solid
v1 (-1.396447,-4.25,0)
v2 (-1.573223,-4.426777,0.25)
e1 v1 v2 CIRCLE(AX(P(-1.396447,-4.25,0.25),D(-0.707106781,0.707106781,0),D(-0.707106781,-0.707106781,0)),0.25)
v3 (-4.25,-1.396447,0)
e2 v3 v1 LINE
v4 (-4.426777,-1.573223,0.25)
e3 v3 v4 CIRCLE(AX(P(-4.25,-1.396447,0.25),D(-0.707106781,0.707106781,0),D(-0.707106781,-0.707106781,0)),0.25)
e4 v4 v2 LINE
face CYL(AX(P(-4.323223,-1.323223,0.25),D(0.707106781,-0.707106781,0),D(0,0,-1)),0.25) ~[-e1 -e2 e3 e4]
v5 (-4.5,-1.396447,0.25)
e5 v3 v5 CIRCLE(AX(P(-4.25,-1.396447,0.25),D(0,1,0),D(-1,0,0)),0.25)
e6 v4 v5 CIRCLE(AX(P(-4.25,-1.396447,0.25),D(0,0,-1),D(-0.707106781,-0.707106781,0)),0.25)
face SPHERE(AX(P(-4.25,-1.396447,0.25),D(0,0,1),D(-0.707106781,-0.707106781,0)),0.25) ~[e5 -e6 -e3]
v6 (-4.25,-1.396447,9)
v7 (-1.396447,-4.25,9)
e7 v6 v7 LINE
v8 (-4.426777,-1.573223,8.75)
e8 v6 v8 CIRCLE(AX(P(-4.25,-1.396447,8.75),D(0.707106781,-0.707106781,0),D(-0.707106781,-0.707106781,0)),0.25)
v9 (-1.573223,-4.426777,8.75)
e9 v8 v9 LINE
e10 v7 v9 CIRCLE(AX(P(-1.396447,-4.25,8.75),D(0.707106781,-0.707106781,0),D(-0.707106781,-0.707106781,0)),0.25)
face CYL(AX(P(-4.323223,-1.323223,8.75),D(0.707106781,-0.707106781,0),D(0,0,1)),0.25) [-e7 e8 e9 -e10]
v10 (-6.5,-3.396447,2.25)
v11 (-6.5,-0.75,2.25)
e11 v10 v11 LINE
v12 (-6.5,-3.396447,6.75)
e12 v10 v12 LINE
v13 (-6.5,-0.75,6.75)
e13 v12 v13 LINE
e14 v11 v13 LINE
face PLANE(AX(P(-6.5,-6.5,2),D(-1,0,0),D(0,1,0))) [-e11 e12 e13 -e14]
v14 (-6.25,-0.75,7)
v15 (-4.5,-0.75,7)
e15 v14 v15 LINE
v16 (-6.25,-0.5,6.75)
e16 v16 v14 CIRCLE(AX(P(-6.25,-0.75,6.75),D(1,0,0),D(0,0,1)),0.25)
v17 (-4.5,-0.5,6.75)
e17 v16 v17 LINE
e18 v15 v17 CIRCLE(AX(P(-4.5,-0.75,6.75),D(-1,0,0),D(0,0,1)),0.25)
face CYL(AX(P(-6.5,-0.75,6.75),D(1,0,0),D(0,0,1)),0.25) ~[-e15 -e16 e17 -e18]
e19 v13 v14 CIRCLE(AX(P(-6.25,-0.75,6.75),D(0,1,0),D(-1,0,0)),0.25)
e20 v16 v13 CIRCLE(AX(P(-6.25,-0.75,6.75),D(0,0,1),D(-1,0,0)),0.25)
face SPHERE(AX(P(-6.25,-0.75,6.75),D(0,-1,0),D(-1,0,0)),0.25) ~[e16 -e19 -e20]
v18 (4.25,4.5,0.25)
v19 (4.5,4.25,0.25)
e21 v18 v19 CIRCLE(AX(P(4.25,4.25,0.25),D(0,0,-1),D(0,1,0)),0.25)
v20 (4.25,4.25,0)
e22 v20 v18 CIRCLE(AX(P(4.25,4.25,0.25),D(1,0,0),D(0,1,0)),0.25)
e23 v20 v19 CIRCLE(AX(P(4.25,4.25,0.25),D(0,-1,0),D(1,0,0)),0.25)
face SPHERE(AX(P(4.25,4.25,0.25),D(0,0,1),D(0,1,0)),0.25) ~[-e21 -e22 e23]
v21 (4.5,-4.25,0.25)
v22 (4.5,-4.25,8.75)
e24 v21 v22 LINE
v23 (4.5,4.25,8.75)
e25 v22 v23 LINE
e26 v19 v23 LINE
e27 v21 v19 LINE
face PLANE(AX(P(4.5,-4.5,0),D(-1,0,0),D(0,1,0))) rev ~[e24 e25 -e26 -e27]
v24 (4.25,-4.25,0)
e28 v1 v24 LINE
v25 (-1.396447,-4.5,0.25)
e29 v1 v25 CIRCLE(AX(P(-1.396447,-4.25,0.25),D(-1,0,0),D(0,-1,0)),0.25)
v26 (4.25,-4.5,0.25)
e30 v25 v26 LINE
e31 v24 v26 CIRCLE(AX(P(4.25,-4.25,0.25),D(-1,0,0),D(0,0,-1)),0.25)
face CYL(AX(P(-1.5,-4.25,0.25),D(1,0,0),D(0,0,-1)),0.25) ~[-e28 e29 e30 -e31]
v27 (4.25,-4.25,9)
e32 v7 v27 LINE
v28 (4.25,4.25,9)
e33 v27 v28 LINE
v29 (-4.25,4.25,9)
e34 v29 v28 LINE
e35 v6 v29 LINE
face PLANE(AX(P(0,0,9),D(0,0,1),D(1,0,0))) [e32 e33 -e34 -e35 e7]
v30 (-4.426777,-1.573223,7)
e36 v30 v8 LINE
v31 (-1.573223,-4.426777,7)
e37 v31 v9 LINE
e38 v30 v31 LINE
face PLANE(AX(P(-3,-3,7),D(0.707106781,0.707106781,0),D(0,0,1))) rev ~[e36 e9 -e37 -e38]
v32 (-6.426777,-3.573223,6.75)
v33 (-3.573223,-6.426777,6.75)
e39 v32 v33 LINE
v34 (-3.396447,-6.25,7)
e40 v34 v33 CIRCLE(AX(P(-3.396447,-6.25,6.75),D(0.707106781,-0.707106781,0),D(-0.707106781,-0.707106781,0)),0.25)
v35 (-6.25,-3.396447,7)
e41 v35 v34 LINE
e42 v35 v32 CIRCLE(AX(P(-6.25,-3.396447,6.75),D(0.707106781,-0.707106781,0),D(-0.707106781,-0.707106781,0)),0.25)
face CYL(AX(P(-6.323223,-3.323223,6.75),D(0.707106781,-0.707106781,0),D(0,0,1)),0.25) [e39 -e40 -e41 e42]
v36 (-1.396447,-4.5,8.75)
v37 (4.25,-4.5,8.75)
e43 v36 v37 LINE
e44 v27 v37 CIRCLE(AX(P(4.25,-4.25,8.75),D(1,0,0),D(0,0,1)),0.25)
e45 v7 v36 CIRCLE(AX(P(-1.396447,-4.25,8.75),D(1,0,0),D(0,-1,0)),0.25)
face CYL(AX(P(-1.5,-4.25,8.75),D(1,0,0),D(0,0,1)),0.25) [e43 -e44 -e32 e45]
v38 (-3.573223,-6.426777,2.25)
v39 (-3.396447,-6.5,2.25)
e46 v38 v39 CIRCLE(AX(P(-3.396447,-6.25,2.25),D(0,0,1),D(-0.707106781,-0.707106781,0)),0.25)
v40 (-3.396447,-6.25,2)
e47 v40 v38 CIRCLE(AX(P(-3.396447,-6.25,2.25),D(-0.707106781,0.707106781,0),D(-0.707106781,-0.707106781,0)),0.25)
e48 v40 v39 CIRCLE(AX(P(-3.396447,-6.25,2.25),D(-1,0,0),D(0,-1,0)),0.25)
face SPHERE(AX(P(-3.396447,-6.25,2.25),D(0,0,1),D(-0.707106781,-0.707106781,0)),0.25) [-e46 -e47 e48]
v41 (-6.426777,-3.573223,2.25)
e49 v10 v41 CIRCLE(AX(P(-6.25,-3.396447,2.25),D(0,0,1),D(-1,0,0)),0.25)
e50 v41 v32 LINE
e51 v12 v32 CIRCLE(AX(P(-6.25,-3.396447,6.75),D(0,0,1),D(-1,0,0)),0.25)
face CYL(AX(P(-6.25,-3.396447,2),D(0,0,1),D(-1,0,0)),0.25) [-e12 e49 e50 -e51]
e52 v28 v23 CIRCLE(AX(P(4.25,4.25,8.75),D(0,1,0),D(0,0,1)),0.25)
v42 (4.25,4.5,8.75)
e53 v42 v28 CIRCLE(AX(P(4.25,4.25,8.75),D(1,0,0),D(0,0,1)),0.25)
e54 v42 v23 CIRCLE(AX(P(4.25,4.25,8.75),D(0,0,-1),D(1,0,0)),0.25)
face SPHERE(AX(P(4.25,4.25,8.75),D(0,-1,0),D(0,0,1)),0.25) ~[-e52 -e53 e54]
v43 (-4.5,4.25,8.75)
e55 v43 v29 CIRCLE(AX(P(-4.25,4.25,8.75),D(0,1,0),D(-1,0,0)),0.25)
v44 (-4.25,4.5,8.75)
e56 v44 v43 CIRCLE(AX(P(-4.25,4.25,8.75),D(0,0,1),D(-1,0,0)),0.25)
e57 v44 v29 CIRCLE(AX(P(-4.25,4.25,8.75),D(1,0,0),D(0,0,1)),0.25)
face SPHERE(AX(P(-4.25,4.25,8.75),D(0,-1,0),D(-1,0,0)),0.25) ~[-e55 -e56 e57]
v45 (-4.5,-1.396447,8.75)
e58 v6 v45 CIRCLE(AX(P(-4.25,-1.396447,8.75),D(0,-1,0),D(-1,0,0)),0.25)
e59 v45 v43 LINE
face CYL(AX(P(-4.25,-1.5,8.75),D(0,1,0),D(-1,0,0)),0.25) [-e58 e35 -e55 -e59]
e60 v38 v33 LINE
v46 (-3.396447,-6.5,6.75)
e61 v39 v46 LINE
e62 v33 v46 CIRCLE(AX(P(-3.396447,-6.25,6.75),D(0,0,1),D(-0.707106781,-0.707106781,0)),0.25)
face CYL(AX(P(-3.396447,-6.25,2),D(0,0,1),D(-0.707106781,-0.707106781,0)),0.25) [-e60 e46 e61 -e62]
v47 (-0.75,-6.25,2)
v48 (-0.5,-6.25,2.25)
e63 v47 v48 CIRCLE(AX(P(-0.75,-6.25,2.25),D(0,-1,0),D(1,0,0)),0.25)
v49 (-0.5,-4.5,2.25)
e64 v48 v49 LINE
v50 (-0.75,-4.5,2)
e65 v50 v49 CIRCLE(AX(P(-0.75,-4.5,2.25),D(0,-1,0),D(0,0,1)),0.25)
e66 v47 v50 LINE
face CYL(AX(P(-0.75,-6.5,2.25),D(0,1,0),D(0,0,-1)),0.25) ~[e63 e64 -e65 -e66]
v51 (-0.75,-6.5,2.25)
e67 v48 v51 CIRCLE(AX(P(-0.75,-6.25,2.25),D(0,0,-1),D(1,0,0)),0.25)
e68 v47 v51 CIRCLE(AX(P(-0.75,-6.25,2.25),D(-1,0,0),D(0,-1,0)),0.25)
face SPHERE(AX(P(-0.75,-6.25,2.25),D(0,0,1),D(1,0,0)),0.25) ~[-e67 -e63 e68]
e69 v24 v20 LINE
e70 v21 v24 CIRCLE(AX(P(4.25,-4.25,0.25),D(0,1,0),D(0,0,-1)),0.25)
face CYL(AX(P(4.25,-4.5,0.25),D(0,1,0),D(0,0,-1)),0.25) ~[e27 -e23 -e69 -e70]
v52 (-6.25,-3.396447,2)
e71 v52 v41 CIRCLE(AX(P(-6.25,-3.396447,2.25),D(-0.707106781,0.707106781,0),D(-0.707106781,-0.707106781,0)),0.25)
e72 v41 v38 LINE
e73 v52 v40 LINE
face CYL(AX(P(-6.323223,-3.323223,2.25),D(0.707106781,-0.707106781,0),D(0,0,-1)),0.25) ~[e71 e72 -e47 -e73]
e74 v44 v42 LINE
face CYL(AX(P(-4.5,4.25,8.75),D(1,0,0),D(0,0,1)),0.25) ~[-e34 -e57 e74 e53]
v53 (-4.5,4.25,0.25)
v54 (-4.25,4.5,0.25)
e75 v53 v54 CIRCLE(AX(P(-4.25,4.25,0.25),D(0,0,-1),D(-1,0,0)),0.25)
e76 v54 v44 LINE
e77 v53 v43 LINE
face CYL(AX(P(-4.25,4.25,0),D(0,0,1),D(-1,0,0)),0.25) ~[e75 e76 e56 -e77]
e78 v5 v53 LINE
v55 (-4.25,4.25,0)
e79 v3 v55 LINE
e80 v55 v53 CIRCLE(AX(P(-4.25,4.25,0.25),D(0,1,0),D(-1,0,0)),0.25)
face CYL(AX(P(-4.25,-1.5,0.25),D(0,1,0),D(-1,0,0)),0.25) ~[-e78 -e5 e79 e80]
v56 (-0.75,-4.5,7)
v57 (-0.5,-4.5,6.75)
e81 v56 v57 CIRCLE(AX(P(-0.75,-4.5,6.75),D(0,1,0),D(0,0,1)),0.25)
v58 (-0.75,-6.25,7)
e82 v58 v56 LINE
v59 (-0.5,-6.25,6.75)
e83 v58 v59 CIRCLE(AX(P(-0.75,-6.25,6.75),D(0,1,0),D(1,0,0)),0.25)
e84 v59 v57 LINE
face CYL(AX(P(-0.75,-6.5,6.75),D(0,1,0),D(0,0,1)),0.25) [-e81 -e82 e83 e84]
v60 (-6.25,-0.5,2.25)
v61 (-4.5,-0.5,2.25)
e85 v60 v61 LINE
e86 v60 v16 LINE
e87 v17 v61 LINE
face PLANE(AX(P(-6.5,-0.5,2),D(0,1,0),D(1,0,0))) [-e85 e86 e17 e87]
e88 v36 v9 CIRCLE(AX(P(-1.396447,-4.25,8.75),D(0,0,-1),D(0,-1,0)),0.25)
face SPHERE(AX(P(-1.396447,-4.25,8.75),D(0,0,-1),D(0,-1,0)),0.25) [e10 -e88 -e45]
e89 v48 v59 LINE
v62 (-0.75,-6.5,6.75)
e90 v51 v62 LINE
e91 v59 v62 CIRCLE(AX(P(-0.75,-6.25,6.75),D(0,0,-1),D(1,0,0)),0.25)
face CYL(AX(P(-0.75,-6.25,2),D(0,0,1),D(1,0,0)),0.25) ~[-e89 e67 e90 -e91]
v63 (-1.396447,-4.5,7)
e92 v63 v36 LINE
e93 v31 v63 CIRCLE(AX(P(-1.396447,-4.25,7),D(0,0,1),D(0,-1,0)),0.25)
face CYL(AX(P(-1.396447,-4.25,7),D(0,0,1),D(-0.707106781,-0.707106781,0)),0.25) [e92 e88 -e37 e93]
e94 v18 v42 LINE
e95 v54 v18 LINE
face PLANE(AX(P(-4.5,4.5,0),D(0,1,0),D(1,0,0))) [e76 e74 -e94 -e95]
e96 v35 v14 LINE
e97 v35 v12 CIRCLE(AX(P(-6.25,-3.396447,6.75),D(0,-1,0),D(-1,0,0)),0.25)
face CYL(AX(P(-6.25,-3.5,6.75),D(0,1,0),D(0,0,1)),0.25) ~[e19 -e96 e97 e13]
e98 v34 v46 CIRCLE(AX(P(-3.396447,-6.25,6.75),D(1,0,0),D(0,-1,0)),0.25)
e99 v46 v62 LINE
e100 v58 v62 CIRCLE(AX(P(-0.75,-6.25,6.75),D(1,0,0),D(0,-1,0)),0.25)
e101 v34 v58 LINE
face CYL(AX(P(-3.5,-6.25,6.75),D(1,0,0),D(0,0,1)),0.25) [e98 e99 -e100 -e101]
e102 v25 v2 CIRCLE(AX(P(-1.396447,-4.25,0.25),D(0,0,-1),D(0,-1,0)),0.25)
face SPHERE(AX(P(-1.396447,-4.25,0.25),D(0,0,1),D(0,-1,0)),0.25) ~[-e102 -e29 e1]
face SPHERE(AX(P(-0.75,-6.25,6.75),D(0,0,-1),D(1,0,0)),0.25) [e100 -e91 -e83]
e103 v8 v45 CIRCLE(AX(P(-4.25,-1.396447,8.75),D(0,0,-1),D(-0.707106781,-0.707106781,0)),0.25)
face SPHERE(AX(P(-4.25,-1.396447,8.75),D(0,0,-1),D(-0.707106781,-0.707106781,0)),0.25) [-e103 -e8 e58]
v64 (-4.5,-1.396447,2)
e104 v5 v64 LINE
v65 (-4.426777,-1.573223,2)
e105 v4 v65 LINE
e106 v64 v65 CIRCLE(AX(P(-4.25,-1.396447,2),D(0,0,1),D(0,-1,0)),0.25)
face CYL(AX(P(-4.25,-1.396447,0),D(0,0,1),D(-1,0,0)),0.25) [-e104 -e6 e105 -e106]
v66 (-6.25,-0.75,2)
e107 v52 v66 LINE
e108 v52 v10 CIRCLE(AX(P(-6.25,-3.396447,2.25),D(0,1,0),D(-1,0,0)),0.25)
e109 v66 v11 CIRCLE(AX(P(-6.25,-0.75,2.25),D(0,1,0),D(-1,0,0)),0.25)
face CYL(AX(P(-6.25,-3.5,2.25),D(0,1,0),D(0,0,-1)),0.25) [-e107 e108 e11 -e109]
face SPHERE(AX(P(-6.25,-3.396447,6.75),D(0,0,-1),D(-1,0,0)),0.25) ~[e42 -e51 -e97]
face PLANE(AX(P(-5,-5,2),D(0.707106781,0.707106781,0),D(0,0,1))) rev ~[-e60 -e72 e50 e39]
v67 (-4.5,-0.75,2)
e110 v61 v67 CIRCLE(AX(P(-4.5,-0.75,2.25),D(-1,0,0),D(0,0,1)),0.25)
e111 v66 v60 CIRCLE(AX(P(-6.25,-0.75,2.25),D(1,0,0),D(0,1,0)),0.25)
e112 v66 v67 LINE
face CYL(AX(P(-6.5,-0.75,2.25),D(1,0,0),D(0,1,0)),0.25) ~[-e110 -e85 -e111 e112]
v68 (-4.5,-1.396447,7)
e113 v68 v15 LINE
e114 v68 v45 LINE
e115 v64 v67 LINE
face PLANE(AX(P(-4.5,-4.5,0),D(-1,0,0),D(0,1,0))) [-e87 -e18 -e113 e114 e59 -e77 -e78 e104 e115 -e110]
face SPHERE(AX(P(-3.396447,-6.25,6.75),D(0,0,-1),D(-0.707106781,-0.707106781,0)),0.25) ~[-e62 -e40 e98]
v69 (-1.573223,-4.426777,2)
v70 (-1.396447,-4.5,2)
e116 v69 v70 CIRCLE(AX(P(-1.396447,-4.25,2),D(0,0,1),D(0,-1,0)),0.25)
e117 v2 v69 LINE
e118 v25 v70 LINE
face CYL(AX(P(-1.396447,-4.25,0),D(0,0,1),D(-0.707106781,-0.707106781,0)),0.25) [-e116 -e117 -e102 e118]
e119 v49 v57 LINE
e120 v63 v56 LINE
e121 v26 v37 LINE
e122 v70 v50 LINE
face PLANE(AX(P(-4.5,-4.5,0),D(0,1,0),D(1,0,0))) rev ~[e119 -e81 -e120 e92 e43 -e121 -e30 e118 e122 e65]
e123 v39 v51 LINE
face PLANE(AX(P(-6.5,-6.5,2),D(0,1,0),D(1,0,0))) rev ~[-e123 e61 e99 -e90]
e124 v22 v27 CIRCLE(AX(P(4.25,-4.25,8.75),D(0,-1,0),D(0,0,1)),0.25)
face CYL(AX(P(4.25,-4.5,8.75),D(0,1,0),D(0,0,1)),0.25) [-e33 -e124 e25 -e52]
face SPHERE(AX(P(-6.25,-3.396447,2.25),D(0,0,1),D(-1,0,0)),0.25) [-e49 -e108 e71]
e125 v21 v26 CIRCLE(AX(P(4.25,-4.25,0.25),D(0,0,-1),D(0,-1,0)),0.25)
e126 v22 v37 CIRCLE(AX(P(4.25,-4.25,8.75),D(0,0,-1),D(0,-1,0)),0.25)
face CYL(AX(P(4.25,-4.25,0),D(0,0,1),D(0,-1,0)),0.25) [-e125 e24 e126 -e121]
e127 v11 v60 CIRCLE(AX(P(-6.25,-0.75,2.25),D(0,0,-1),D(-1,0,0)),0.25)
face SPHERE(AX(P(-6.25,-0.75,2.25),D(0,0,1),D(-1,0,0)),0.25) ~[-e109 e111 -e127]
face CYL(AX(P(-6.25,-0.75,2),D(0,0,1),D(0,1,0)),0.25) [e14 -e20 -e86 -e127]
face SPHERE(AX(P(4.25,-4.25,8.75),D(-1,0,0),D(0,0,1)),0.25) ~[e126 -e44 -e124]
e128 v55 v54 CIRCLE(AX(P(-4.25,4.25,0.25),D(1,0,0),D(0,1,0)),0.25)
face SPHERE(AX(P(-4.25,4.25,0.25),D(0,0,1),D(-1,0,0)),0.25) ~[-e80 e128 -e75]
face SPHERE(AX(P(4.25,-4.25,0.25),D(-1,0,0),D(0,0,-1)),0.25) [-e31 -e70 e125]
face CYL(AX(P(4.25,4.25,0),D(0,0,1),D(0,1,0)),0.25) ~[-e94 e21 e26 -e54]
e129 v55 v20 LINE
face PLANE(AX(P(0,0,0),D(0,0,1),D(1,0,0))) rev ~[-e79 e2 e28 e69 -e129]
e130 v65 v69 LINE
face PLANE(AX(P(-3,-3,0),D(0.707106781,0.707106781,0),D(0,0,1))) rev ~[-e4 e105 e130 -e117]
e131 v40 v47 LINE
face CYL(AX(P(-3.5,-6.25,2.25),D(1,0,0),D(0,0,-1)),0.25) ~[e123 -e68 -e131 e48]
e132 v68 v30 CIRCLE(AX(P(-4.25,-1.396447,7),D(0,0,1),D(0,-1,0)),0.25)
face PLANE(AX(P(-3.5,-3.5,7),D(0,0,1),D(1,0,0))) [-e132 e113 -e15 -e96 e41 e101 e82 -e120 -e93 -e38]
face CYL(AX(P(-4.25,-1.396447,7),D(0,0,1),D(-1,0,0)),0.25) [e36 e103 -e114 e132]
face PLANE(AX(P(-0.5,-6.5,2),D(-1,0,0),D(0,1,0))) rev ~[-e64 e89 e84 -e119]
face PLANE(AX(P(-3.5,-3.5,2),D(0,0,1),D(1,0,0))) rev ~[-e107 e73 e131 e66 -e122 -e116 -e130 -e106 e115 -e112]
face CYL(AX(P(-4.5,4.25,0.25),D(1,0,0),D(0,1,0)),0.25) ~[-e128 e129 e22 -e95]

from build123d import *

# Parameters (mm, degrees)
F0_W     = 9
F0_H     = 9
F1_DEPTH = 9
F3_START = 2
F2_W     = 6
F2_H     = 6
F3_DEPTH = 5
F4_SIZE  = 3
F5_SIZE  = 3
F6_SIZE  = 3
F9_R     = 0.25


# Not quite as in the source:
# - a feature of the source that left no trace in its solid (it failed there, or was rolled back) is left out


with BuildPart() as f1:
    # F0 (on Top) → F1 (new body)
    with BuildSketch(Plane.XY):
        Rectangle(F0_W, F0_H)
    extrude(amount=F1_DEPTH)

    # F2 (on Top) → F3 (join)
    with BuildSketch(Plane.XY.offset(F3_START)):
        with Locations((-3.5, -3.5)):
            Rectangle(F2_W, F2_H)
    extrude(amount=F3_DEPTH)

    # F4
    f4_edges = [f1.edges().sort_by_distance(p)[0] for p in [
        (-4.5, -4.5, 1),
    ]]
    chamfer(f4_edges, length=F4_SIZE)

    # F5
    f5_edges = [f1.edges().sort_by_distance(p)[0] for p in [
        (-6.5, -6.5, 4.5),
    ]]
    chamfer(f5_edges, length=F5_SIZE)

    # F6
    f6_edges = [f1.edges().sort_by_distance(p)[0] for p in [
        (-4.5, -4.5, 8),
    ]]
    chamfer(f6_edges, length=F6_SIZE)

    # F9
    f9_edges = [f1.edges().sort_by_distance(p)[0] for p in [
        (-0.5, -6.5, 4.5),
        (-0.5, -5.5, 7),
        (-0.5, -5.5, 2),
        (-2, -6.5, 2),
        (-2, -6.5, 7),
        (-3.5, -6.5, 4.5),
        (-5, -5, 7),
        (-5, -5, 2),
        (-6.5, -3.5, 4.5),
        (-6.5, -2, 7),
        (-6.5, -0.5, 4.5),
        (-6.5, -2, 2),
        (-5.5, -0.5, 2),
        (-5.5, -0.5, 7),
        (-4.5, 1.5, 9),
        (-4.5, -1.5, 8),
        (-4.5, 4.5, 4.5),
        (-4.5, 1.5, 0),
        (-4.5, -1.5, 1),
        (1.5, -4.5, 9),
        (-3, -3, 9),
        (4.5, 0, 9),
        (0, 4.5, 9),
        (-1.5, -4.5, 8),
        (4.5, 4.5, 4.5),
        (0, 4.5, 0),
        (1.5, -4.5, 0),
        (-3, -3, 0),
        (4.5, 0, 0),
        (-1.5, -4.5, 1),
        (4.5, -4.5, 4.5),
    ]]
    fillet(f9_edges, radius=F9_R)


solid = f1.part
